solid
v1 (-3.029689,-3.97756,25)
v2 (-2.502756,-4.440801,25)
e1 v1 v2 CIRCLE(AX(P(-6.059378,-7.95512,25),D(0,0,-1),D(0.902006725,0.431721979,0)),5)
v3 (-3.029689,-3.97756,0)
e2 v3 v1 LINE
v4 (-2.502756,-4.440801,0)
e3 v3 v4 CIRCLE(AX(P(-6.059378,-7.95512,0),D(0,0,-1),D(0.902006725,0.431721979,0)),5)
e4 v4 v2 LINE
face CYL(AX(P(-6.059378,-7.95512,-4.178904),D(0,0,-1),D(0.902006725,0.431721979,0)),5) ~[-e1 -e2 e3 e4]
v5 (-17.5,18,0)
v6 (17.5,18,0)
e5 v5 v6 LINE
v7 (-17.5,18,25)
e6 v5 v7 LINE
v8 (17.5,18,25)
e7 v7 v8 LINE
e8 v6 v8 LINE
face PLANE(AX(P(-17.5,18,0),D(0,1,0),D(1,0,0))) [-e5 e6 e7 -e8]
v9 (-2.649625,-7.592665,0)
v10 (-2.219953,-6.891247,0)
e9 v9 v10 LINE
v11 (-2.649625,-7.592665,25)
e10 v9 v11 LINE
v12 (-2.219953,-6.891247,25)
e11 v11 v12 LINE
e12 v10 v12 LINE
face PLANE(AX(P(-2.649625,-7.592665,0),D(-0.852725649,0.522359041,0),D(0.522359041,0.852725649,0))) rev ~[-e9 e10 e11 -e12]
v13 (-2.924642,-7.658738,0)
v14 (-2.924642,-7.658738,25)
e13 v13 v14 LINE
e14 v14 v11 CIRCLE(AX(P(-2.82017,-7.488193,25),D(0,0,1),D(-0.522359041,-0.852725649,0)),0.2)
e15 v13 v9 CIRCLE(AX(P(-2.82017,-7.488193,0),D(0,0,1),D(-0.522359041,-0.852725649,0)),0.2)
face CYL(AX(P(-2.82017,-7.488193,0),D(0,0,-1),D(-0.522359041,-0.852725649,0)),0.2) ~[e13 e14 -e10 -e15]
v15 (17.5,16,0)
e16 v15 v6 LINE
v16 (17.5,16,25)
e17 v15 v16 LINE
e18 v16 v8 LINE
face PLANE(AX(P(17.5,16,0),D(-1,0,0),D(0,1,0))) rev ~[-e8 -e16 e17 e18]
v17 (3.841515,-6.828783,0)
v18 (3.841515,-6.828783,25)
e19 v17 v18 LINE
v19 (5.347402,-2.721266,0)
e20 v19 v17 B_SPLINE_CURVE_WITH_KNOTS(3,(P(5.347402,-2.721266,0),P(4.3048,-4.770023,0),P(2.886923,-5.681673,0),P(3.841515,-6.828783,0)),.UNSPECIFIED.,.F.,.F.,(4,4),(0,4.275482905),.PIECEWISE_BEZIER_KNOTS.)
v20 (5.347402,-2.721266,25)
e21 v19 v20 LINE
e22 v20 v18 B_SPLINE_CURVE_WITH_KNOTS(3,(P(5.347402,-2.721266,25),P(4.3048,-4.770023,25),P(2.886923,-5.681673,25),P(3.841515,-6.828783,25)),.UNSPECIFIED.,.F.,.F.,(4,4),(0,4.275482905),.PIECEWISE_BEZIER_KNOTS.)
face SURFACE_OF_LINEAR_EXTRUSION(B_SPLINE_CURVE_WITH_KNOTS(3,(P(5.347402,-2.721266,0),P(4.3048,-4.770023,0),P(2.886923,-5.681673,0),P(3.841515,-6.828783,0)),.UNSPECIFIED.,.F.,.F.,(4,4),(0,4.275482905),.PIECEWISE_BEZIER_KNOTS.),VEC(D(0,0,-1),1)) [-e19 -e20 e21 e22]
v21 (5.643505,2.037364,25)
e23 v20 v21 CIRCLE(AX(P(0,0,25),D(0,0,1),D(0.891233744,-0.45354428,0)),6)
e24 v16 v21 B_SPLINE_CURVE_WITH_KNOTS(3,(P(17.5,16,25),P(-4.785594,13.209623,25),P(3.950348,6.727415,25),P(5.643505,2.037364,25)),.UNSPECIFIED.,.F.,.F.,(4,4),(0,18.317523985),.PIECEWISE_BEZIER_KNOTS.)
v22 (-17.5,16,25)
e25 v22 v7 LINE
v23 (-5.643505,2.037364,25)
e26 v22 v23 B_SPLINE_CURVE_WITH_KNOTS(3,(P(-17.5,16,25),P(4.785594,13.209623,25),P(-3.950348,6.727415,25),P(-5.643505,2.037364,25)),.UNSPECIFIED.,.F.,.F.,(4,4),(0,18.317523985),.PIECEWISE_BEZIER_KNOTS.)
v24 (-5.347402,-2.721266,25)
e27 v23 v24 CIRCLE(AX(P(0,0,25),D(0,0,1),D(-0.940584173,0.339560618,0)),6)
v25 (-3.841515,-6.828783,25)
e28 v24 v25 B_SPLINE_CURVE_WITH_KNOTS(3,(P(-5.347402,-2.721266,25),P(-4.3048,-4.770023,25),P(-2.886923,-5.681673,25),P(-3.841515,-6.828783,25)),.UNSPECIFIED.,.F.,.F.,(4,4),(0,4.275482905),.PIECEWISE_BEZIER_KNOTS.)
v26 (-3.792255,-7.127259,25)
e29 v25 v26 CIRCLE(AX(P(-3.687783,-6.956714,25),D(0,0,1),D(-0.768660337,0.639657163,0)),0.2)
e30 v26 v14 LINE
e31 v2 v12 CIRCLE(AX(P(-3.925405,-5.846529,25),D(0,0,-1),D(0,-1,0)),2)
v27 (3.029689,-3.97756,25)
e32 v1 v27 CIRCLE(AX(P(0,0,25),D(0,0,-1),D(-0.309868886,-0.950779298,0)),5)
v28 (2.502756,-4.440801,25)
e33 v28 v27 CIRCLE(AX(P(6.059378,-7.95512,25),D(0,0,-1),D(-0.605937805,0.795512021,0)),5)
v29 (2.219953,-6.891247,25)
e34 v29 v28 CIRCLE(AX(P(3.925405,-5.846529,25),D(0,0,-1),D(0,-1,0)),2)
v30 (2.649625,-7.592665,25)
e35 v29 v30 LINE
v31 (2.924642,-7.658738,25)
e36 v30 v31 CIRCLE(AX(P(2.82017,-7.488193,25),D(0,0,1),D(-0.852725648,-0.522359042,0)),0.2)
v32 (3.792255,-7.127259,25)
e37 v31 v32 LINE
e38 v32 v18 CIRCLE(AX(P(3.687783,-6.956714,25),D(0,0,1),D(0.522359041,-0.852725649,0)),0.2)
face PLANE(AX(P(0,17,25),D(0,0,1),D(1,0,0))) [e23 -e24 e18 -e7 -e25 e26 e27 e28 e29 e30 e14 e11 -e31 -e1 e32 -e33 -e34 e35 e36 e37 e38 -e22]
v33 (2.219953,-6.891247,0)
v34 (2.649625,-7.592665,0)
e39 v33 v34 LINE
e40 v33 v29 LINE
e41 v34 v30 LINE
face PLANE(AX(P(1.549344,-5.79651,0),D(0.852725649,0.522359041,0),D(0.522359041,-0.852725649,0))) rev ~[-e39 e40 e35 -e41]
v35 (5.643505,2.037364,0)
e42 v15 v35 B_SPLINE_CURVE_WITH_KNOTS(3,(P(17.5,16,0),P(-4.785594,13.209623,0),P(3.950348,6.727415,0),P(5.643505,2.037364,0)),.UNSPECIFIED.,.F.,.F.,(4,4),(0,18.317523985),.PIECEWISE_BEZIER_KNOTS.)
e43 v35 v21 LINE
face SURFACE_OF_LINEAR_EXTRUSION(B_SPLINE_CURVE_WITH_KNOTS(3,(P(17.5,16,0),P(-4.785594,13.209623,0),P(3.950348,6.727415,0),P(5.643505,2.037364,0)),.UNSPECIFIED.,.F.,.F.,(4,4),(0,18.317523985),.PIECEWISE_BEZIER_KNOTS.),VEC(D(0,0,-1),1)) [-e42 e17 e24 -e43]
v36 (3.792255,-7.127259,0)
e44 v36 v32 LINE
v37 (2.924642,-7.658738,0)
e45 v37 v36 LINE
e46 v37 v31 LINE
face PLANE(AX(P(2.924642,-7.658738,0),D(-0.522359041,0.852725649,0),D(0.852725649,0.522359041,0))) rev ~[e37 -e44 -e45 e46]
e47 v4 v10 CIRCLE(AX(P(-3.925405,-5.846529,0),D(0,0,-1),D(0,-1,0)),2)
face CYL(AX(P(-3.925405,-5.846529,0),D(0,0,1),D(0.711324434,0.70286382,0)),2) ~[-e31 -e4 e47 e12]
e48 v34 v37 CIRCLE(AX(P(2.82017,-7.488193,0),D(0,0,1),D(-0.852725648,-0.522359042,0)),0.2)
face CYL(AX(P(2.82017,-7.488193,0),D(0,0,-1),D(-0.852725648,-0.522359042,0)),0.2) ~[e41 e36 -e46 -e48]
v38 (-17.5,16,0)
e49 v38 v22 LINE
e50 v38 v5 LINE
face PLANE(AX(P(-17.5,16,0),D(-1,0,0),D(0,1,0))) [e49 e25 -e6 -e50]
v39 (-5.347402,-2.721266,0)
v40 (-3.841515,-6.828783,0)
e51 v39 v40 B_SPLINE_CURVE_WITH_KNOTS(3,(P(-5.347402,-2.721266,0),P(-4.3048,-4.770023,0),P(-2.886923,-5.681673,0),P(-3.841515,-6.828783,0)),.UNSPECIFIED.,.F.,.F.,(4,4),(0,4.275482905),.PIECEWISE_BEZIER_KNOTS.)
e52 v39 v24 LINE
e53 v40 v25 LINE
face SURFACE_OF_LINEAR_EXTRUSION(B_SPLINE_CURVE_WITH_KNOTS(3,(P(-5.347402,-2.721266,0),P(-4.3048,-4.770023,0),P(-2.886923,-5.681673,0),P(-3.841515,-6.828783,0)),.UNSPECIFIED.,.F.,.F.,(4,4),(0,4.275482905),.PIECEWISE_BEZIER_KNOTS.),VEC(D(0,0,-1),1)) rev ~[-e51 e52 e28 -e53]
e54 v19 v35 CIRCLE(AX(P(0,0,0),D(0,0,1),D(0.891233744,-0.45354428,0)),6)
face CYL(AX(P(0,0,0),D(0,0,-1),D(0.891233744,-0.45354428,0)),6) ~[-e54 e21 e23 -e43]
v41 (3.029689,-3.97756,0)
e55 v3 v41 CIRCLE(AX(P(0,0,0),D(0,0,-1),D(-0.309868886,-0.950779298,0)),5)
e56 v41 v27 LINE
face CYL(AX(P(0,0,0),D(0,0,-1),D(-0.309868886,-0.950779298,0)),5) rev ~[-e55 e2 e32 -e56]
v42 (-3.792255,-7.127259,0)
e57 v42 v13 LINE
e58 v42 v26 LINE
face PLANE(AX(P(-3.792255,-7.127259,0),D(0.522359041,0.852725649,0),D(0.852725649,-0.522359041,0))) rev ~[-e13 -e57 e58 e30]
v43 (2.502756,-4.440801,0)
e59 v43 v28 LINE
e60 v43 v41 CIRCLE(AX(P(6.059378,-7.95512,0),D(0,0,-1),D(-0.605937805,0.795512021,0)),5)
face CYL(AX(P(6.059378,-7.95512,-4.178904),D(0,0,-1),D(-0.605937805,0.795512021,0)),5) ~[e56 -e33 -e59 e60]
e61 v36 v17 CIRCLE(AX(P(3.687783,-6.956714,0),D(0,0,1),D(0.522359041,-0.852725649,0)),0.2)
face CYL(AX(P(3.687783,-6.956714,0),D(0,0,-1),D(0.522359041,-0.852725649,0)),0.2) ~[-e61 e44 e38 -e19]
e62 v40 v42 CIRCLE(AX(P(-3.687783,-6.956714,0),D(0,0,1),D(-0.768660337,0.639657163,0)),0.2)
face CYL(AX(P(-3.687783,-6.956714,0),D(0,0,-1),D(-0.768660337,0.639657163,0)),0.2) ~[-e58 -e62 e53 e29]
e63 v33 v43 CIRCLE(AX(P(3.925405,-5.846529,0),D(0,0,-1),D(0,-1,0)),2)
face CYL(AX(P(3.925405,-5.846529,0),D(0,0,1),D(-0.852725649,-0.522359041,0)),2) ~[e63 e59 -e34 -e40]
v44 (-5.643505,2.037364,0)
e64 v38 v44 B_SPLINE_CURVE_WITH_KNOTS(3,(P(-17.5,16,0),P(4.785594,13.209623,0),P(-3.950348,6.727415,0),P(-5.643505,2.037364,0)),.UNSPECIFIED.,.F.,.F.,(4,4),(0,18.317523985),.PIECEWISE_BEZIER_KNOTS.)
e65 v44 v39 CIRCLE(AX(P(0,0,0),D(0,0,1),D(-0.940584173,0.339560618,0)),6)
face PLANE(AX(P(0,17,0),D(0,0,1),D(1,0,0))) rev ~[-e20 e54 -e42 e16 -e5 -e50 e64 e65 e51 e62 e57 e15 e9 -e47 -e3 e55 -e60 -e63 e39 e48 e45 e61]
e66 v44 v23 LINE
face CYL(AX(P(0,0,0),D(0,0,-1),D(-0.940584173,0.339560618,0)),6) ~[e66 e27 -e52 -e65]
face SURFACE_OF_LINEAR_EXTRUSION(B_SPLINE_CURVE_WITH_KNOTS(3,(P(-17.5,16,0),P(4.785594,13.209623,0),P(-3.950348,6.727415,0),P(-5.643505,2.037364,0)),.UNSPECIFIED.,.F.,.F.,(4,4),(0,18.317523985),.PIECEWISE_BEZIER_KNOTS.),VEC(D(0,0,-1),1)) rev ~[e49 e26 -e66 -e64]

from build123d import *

# Parameters (mm, degrees)
F0_W        = 35
F0_H        = 2
F1_DEPTH    = 25
F2_T1_DEPTH = 33.357808199
F3_R        = 2


# Not quite as in the source:
# - a fillet or chamfer that OpenCascade refuses, or shapes differently, is made with other operations: its cross-section is extruded or revolved along the edge and cut away or added


with BuildPart() as f1:
    # F0 (on Top) → F1 (new body)
    with BuildSketch(Plane.XY):
        with Locations((0, 17)):
            Rectangle(F0_W, F0_H)
        with BuildLine():
            ThreePointArc((-5.6435050377, 2.0373637106), (0, 6), (5.6435050377, 2.0373637106))
            add(Edge.make_bspline(
                [(17.5, 16), (-4.7855940647, 13.2096234411), (3.9503478981, 6.7274152696), (5.6435050377, 2.0373637106)],
                knots=[0, 0, 0, 0, 18.317523985, 18.317523985, 18.317523985, 18.317523985], degree=3))
            Line((17.5, 16), (-17.5, 16))
            add(Edge.make_bspline(
                [(-17.5, 16), (4.7855940647, 13.2096234411), (-3.9503478981, 6.7274152696), (-5.6435050377, 2.0373637106)],
                knots=[0, 0, 0, 0, 18.317523985, 18.317523985, 18.317523985, 18.317523985], degree=3))
        make_face()
        with BuildLine():
            ThreePointArc((-1.5493444278, -4.7538964907), (0, 5), (1.5493444278, -4.7538964907))
            Line((1.5493444278, -4.7538964907), (1.5493444278, -5.7965103161))
            ThreePointArc((1.5493444278, -5.7965103161), (3.7756538243, -4.6630932007), (5.3474024613, -2.7212656829))
            ThreePointArc((5.3474024613, -2.7212656829), (5.9884180164, -0.3726253627), (5.6435050377, 2.0373637106))
            ThreePointArc((5.6435050377, 2.0373637106), (0, 6), (-5.6435050377, 2.0373637106))
            ThreePointArc((-5.6435050377, 2.0373637106), (-5.9884180164, -0.3726253627), (-5.3474024613, -2.7212656829))
            ThreePointArc((-5.3474024613, -2.7212656829), (-3.7756538243, -4.6630932007), (-1.5493444278, -5.7965103161))
            Line((-1.5493444278, -5.7965103161), (-1.5493444278, -4.7538964907))
        make_face()
        with BuildLine():
            Line((-2.6496251192, -7.5926648612), (-1.5493444278, -5.7965103161))
            ThreePointArc((-1.5493444278, -5.7965103161), (-3.7756538243, -4.6630932007), (-5.3474024613, -2.7212656829))
            add(Edge.make_bspline(
                [(-5.3474024613, -2.7212656829), (-4.3048003044, -4.7700231324), (-2.8869232094, -5.6816728311), (-3.8415154138, -6.828782889)],
                knots=[0, 0, 0, 0, 4.2754829053, 4.2754829053, 4.2754829053, 4.2754829053], degree=3))
            ThreePointArc((-3.8415154138, -6.828782889), (-3.8851139698, -6.989281561), (-3.7922551547, -7.1272594514))
            Line((-3.7922551547, -7.1272594514), (-2.9246420572, -7.6587381827))
            ThreePointArc((-2.9246420572, -7.6587381827), (-2.7734493553, -7.6826593947), (-2.6496251192, -7.5926648612))
        make_face()
        with BuildLine():
            ThreePointArc((5.3474024613, -2.7212656829), (3.7756538243, -4.6630932007), (1.5493444278, -5.7965103161))
            Line((1.5493444278, -5.7965103161), (2.6496251192, -7.5926648612))
            ThreePointArc((2.6496251192, -7.5926648612), (2.7734493553, -7.6826593947), (2.9246420572, -7.6587381827))
            Line((2.9246420572, -7.6587381827), (3.7922551547, -7.1272594514))
            ThreePointArc((3.7922551547, -7.1272594514), (3.8851139698, -6.989281561), (3.8415154138, -6.828782889))
            add(Edge.make_bspline(
                [(5.3474024613, -2.7212656829), (4.3048003044, -4.7700231324), (2.8869232094, -5.6816728311), (3.8415154138, -6.828782889)],
                knots=[0, 0, 0, 0, 4.2754829053, 4.2754829053, 4.2754829053, 4.2754829053], degree=3))
        make_face()
    extrude(amount=F1_DEPTH)

    # F2: fillet of radius 5 on 2 edges, made by hand

    # F2_s2 → F2_t1 (cut)
    with BuildSketch(Plane.XY.offset(-4.1789040995)):
        with BuildLine():
            ThreePointArc((-1.5493444278, -5.7965103161), (-2.1813631769, -4.7990149212), (-3.0296890274, -3.9775601061))
            ThreePointArc((-3.0296890274, -3.9775601061), (-2.3221889224, -4.4280287498), (-1.5493444278, -4.7538964907))
            Line((-1.5493444278, -4.7538964907), (-1.5493444278, -5.7965103161))
        make_face()
        with BuildLine():
            ThreePointArc((3.0296890274, -3.9775601061), (2.1813631769, -4.7990149212), (1.5493444278, -5.7965103161))
            Line((1.5493444278, -5.7965103161), (1.5493444278, -4.7538964907))
            ThreePointArc((1.5493444278, -4.7538964907), (2.3221889224, -4.4280287498), (3.0296890274, -3.9775601061))
        make_face()
    extrude(amount=F2_T1_DEPTH, mode=Mode.SUBTRACT)

    # F3
    f3_edges = [f1.edges().sort_by_distance(p)[0] for p in [
        (-1.549344, -5.79651, 12.5),
        (1.549344, -5.79651, 12.5),
    ]]
    fillet(f3_edges, radius=F3_R)


solid = f1.part
